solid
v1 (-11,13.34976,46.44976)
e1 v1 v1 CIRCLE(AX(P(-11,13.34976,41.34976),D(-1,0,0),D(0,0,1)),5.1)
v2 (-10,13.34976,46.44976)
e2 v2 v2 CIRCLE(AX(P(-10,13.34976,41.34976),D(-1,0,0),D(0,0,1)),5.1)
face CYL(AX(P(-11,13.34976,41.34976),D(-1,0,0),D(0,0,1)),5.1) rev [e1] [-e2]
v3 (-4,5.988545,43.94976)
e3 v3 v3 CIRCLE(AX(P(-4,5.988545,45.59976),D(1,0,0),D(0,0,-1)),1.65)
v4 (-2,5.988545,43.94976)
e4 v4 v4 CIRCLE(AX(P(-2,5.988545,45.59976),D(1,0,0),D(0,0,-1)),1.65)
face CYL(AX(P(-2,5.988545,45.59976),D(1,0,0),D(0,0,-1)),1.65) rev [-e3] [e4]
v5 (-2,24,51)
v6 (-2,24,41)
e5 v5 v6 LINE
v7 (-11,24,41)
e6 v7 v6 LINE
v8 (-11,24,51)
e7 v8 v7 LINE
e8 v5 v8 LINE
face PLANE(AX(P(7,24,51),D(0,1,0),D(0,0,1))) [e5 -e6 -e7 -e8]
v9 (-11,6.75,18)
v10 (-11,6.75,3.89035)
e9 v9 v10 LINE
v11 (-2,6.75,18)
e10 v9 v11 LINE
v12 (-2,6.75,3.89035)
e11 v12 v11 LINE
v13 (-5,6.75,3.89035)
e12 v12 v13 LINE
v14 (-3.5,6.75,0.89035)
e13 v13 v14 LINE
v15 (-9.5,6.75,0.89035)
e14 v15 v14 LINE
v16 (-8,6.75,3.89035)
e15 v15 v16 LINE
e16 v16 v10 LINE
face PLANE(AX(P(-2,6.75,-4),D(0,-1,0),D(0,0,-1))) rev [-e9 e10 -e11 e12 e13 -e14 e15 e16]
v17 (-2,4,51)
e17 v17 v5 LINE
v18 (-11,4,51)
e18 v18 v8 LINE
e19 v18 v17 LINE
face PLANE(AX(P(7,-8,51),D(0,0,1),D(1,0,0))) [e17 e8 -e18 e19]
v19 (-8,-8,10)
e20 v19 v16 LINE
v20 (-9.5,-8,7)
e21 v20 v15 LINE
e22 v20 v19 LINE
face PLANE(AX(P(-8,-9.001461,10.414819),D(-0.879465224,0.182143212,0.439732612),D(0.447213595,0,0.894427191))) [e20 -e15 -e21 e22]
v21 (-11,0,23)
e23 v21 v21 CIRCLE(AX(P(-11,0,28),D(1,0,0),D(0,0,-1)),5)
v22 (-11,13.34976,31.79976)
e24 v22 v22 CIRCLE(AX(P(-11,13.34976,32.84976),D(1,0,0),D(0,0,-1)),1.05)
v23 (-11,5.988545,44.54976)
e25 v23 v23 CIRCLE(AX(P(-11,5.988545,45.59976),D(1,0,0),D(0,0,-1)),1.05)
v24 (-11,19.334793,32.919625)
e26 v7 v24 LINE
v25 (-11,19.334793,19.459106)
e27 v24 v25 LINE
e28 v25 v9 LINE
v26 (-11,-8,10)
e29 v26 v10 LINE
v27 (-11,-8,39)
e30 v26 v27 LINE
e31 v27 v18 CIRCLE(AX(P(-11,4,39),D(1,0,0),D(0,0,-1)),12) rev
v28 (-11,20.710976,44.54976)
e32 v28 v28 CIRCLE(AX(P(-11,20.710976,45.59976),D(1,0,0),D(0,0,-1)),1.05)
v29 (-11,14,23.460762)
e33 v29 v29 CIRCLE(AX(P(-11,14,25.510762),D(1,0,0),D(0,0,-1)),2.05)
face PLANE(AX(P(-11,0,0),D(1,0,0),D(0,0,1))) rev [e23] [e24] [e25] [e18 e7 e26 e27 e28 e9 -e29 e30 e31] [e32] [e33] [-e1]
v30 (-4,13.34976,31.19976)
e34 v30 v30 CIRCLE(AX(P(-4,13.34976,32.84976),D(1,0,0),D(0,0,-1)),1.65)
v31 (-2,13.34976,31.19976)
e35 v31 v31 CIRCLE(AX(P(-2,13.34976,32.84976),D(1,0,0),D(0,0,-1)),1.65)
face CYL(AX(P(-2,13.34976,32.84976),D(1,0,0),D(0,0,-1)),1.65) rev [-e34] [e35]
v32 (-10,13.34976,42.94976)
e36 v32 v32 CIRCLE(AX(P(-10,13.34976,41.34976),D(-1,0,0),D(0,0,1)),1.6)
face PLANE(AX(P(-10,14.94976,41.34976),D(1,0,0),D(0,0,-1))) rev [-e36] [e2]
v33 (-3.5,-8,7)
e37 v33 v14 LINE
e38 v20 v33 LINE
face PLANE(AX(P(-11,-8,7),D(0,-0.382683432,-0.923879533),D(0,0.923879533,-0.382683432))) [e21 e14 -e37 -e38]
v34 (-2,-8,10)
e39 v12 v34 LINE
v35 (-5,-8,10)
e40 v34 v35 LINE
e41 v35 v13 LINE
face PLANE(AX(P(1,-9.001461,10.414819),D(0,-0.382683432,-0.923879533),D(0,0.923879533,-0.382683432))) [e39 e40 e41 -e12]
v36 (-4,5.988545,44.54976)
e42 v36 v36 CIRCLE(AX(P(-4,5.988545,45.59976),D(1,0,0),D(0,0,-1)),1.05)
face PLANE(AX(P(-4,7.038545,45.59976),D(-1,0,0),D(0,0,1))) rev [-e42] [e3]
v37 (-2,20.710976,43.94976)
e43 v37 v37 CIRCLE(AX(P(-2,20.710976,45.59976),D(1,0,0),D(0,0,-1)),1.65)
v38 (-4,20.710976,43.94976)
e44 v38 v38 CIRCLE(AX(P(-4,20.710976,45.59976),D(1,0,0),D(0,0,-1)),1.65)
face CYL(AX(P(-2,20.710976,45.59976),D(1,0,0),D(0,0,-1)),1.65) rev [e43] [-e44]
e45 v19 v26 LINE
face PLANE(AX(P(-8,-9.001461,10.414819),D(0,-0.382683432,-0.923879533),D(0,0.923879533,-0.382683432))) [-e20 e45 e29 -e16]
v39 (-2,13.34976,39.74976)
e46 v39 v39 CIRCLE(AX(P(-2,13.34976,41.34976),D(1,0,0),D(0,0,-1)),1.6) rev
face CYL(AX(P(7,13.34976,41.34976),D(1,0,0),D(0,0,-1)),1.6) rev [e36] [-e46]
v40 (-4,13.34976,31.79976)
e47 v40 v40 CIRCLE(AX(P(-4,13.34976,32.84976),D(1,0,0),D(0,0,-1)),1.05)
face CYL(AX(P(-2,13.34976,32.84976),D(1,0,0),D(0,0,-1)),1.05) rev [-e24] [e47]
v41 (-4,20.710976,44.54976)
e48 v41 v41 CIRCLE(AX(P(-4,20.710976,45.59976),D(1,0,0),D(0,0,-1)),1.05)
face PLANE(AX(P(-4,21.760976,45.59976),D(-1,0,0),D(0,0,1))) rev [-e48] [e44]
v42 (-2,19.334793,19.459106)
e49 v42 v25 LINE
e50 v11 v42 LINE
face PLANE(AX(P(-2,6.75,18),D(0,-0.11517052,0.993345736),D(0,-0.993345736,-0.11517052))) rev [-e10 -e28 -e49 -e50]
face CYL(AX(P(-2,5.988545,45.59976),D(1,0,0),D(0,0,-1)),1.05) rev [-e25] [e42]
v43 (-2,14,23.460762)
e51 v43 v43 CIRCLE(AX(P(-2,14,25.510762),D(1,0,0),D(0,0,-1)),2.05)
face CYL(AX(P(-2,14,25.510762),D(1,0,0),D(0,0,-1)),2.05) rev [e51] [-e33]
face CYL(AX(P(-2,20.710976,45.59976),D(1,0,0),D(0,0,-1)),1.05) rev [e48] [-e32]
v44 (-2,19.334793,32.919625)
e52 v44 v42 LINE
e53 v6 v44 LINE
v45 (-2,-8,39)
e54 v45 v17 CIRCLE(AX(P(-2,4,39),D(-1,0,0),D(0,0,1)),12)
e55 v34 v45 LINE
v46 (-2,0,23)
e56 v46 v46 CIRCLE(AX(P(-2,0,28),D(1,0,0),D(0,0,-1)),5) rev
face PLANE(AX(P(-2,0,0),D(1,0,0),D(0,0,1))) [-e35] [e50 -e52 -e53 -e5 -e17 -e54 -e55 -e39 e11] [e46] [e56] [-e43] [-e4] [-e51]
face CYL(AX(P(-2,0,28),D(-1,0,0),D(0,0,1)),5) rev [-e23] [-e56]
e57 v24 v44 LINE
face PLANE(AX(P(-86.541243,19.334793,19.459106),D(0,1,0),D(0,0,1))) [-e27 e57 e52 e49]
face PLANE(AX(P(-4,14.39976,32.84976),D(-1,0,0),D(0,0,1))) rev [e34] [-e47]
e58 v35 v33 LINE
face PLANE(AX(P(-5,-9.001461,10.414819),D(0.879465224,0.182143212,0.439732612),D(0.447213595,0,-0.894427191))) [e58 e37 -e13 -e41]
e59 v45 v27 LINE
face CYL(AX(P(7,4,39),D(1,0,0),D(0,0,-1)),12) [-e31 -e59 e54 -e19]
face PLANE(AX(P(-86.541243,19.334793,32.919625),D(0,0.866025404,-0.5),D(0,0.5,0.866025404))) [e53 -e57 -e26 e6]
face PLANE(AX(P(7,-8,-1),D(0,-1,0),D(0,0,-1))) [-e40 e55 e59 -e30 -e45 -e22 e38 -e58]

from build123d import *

# Parameters (mm, degrees)
SKETCH1_W                                        = 32
SKETCH1_H                                        = 52
BOSS_EXTRUDE1_DEPTH                              = 9
CUT_EXTRUDE2_DEPTH                               = 58.078892771
F_10_0_10_DIAMETER_HOLE1_D                       = 10
FILLET3_R                                        = 12
CUT_EXTRUDE3_DEPTH                               = 58.078892771
M4X0_7_TAPPED_HOLE2_D                            = 2.1
M4X0_7_TAPPED_HOLE2_CBORE_D                      = 3.3
M4X0_7_TAPPED_HOLE2_CBORE_DEPTH                  = 2
CBORE_FOR_M3_HEX_HEAD_MACHINE_SCREW5_D           = 3.2
CBORE_FOR_M3_HEX_HEAD_MACHINE_SCREW5_CBORE_D     = 10.2
CBORE_FOR_M3_HEX_HEAD_MACHINE_SCREW5_CBORE_DEPTH = 1
F_4_1_4_1_DIAMETER_HOLE3_D                       = 4.1
CUT_EXTRUDE4_DEPTH                               = 58.078892771
FILLET3_OF_MIRROR11_R                            = 12
CUT_EXTRUDE5_START                               = -9
CUT_EXTRUDE5_OUTLINE_R                           = 5
CUT_EXTRUDE5_OUTLINE_R_2                         = 2.05
CUT_EXTRUDE5_OUTLINE_R_3                         = 1.05
CUT_EXTRUDE5_OUTLINE_R_4                         = 1.6
CUT_EXTRUDE5_DEPTH                               = 9
F_4_1_4_1_DIAMETER_HOLE8_D                       = 4.1
M4X0_7_TAPPED_HOLE3_D                            = 2.1
M4X0_7_TAPPED_HOLE3_CBORE_D                      = 3.3
M4X0_7_TAPPED_HOLE3_CBORE_DEPTH                  = 2


# Read off the part's stored shape, not the designer's step: Cut-Extrude5
with BuildPart() as part:
    # Sketch1 → Boss-Extrude1 (new body)
    with BuildSketch(Plane(origin=(-2, 0, 0), x_dir=(0, -1, 0), z_dir=(-1, 0, 0))):
        with Locations((-8, 25)):
            Rectangle(SKETCH1_W, SKETCH1_H)
    boss_extrude1 = extrude(amount=-BOSS_EXTRUDE1_DEPTH)

    # Sketch3 → Cut-Extrude2 (cut, through all)
    with BuildSketch(Plane(origin=(7, 0, 0), x_dir=(0, 0, -1), z_dir=(1, 0, 0))):
        Polygon((4, 6.75), (-18, 6.75), (-20, 24), (4, 24), align=None)
    cut_extrude2 = extrude(amount=-CUT_EXTRUDE2_DEPTH, mode=Mode.SUBTRACT)

    # Ø10.0 (10) Diameter Hole1 (through all)
    with Locations(Plane.ZY.offset(2)):
        with Locations((28, 0)):
            f_10_0_10_diameter_hole1 = Hole(F_10_0_10_DIAMETER_HOLE1_D / 2)

    # Fillet3
    fillet3_edges = [part.edges().sort_by_distance(p)[0] for p in [
        (2.5, -8, 51),
    ]]
    fillet(fillet3_edges, radius=FILLET3_R)

    # Cut-Sweep1: sweep along a path in Sketch22
    with BuildLine(Plane(origin=(-2, 0, 0), x_dir=(0, -1, 0), z_dir=(-1, 0, 0))) as cut_sweep1_path:
        Line((8, 11), (-6.75, 4.890349955))
    # Sketch21 → Cut-Sweep1 (sweep, cut)
    with BuildSketch(Plane.XZ.offset(8)):
        Polygon((7, 7), (5.5, 7), (4, 10), (7, 10), align=None)
        Polygon((1, 10), (-0.5, 7), (-2, 7), (-2, 10), align=None)
    cut_sweep1 = sweep(path=cut_sweep1_path.line, mode=Mode.SUBTRACT)

    # Sketch23 → Cut-Extrude3 (cut, symmetric)
    with BuildSketch(Plane.ZY.offset(2)):
        Polygon((-1, 6.75), (-1, -8), (7, -8), (0.890349955, 6.75), align=None)
    cut_extrude3 = extrude(amount=CUT_EXTRUDE3_DEPTH, both=True, mode=Mode.SUBTRACT)

    # M4x0.7 Tapped Hole2 (through all)
    with Locations(Plane(origin=(-2, 13.349760492, 32.849760492), x_dir=(0, 0, -1), z_dir=(-1, 0, 0))):
        with Locations((0, 0), (-12.75, -7.361215932), (-12.75, 7.361215932)):
            CounterBoreHole(M4X0_7_TAPPED_HOLE2_D / 2, M4X0_7_TAPPED_HOLE2_CBORE_D / 2, M4X0_7_TAPPED_HOLE2_CBORE_DEPTH)

    # CBORE for M3 Hex Head Machine Screw5 (through all)
    with Locations(Plane(origin=(7, 13.349760492, 41.349760492), x_dir=(0, 0, 1), z_dir=(1, 0, 0))):
        with Locations((0, 0)):
            cbore_for_m3_hex_head_machine_screw5 = CounterBoreHole(CBORE_FOR_M3_HEX_HEAD_MACHINE_SCREW5_D / 2, CBORE_FOR_M3_HEX_HEAD_MACHINE_SCREW5_CBORE_D / 2, CBORE_FOR_M3_HEX_HEAD_MACHINE_SCREW5_CBORE_DEPTH)

    # Ø4.1 (4.1) Diameter Hole3 (through all)
    with Locations(Plane(origin=(-2, 14, 25.510762466), x_dir=(0, 0, -1), z_dir=(-1, 0, 0))):
        with Locations((0, 0)):
            Hole(F_4_1_4_1_DIAMETER_HOLE3_D / 2)

    # Sketch37 → Cut-Extrude4 (cut, symmetric)
    with BuildSketch(Plane.ZY.offset(2)):
        Polygon((32.919624828, 19.334793219), (41, 24), (20, 24), (19.867875139, 22.860423075), (19.45910646, 19.334793219), align=None)
    cut_extrude4 = extrude(amount=CUT_EXTRUDE4_DEPTH, both=True, mode=Mode.SUBTRACT)

    # Mirror11: Boss-Extrude1, Cut-Extrude2, Ø10.0 (10) Diameter Hole1, Cut-Sweep1, Cut-Extrude3, CBORE for M3 Hex Head Machine Screw5, Cut-Extrude4 across plane
    add(boss_extrude1.mirror(Plane.ZY.offset(2)))
    add(cut_extrude2.mirror(Plane.ZY.offset(2)), mode=Mode.SUBTRACT)
    add(f_10_0_10_diameter_hole1.mirror(Plane.ZY.offset(2)), mode=Mode.SUBTRACT)
    add(cut_sweep1.mirror(Plane.ZY.offset(2)), mode=Mode.SUBTRACT)
    add(cut_extrude3.mirror(Plane.ZY.offset(2)), mode=Mode.SUBTRACT)
    add(cbore_for_m3_hex_head_machine_screw5.mirror(Plane.ZY.offset(2)), mode=Mode.SUBTRACT)
    add(cut_extrude4.mirror(Plane.ZY.offset(2)), mode=Mode.SUBTRACT)

    # Fillet3 of Mirror11
    fillet3_of_mirror11_edges = [part.edges().sort_by_distance(p)[0] for p in [
        (-6.5, -8, 51),
    ]]
    fillet(fillet3_of_mirror11_edges, radius=FILLET3_OF_MIRROR11_R)

    # Cut-Extrude5 outline → Cut-Extrude5 (cut)
    with BuildSketch(Plane(origin=(7, 0, 0), x_dir=(0, 0, -1), z_dir=(1, 0, 0)).offset(CUT_EXTRUDE5_START)):
        with BuildLine():
            Line((-32.919624828, 19.334793219), (-41, 24))
            Line((-41, 24), (-51, 24))
            Line((-51, 24), (-51, 4))
            ThreePointArc((-51, 4), (-47.485281374, -4.485281374), (-39, -8))
            Line((-39, -8), (-7, -8))
            Line((-7, -8), (-0.890349955, 6.75))
            Line((-0.890349955, 6.75), (-18, 6.75))
            Line((-18, 6.75), (-19.45910646, 19.334793219))
            Line((-19.45910646, 19.334793219), (-32.919624828, 19.334793219))
        make_face()
        with Locations((-28, 0)):
            Circle(CUT_EXTRUDE5_OUTLINE_R, mode=Mode.SUBTRACT)
        with Locations((-25.510762466, 14)):
            Circle(CUT_EXTRUDE5_OUTLINE_R_2, mode=Mode.SUBTRACT)
        with Locations((-45.599760492, 5.98854456)):
            Circle(CUT_EXTRUDE5_OUTLINE_R_3, mode=Mode.SUBTRACT)
        with Locations((-41.349760492, 13.349760492)):
            Circle(CUT_EXTRUDE5_OUTLINE_R_4, mode=Mode.SUBTRACT)
        with Locations((-32.849760492, 13.349760492)):
            Circle(CUT_EXTRUDE5_OUTLINE_R_3, mode=Mode.SUBTRACT)
        with Locations((-45.599760492, 20.710976424)):
            Circle(CUT_EXTRUDE5_OUTLINE_R_3, mode=Mode.SUBTRACT)
    extrude(amount=CUT_EXTRUDE5_DEPTH, mode=Mode.SUBTRACT)

    # Ø4.1 (4.1) Diameter Hole8 (through all)
    with Locations(Plane(origin=(-2, 14, 25.510762466), x_dir=(0, 0, 1), z_dir=(1, 0, 0))):
        with Locations((0, 0)):
            Hole(F_4_1_4_1_DIAMETER_HOLE8_D / 2)

    # M4x0.7 Tapped Hole3 (through all)
    with Locations(Plane(origin=(-2, 13.349760492, 32.849760492), x_dir=(0, 0, 1), z_dir=(1, 0, 0))):
        with Locations((0, 0), (12.75, -7.361215932), (12.75, 7.361215932)):
            CounterBoreHole(M4X0_7_TAPPED_HOLE3_D / 2, M4X0_7_TAPPED_HOLE3_CBORE_D / 2, M4X0_7_TAPPED_HOLE3_CBORE_DEPTH)


solid = part.part
